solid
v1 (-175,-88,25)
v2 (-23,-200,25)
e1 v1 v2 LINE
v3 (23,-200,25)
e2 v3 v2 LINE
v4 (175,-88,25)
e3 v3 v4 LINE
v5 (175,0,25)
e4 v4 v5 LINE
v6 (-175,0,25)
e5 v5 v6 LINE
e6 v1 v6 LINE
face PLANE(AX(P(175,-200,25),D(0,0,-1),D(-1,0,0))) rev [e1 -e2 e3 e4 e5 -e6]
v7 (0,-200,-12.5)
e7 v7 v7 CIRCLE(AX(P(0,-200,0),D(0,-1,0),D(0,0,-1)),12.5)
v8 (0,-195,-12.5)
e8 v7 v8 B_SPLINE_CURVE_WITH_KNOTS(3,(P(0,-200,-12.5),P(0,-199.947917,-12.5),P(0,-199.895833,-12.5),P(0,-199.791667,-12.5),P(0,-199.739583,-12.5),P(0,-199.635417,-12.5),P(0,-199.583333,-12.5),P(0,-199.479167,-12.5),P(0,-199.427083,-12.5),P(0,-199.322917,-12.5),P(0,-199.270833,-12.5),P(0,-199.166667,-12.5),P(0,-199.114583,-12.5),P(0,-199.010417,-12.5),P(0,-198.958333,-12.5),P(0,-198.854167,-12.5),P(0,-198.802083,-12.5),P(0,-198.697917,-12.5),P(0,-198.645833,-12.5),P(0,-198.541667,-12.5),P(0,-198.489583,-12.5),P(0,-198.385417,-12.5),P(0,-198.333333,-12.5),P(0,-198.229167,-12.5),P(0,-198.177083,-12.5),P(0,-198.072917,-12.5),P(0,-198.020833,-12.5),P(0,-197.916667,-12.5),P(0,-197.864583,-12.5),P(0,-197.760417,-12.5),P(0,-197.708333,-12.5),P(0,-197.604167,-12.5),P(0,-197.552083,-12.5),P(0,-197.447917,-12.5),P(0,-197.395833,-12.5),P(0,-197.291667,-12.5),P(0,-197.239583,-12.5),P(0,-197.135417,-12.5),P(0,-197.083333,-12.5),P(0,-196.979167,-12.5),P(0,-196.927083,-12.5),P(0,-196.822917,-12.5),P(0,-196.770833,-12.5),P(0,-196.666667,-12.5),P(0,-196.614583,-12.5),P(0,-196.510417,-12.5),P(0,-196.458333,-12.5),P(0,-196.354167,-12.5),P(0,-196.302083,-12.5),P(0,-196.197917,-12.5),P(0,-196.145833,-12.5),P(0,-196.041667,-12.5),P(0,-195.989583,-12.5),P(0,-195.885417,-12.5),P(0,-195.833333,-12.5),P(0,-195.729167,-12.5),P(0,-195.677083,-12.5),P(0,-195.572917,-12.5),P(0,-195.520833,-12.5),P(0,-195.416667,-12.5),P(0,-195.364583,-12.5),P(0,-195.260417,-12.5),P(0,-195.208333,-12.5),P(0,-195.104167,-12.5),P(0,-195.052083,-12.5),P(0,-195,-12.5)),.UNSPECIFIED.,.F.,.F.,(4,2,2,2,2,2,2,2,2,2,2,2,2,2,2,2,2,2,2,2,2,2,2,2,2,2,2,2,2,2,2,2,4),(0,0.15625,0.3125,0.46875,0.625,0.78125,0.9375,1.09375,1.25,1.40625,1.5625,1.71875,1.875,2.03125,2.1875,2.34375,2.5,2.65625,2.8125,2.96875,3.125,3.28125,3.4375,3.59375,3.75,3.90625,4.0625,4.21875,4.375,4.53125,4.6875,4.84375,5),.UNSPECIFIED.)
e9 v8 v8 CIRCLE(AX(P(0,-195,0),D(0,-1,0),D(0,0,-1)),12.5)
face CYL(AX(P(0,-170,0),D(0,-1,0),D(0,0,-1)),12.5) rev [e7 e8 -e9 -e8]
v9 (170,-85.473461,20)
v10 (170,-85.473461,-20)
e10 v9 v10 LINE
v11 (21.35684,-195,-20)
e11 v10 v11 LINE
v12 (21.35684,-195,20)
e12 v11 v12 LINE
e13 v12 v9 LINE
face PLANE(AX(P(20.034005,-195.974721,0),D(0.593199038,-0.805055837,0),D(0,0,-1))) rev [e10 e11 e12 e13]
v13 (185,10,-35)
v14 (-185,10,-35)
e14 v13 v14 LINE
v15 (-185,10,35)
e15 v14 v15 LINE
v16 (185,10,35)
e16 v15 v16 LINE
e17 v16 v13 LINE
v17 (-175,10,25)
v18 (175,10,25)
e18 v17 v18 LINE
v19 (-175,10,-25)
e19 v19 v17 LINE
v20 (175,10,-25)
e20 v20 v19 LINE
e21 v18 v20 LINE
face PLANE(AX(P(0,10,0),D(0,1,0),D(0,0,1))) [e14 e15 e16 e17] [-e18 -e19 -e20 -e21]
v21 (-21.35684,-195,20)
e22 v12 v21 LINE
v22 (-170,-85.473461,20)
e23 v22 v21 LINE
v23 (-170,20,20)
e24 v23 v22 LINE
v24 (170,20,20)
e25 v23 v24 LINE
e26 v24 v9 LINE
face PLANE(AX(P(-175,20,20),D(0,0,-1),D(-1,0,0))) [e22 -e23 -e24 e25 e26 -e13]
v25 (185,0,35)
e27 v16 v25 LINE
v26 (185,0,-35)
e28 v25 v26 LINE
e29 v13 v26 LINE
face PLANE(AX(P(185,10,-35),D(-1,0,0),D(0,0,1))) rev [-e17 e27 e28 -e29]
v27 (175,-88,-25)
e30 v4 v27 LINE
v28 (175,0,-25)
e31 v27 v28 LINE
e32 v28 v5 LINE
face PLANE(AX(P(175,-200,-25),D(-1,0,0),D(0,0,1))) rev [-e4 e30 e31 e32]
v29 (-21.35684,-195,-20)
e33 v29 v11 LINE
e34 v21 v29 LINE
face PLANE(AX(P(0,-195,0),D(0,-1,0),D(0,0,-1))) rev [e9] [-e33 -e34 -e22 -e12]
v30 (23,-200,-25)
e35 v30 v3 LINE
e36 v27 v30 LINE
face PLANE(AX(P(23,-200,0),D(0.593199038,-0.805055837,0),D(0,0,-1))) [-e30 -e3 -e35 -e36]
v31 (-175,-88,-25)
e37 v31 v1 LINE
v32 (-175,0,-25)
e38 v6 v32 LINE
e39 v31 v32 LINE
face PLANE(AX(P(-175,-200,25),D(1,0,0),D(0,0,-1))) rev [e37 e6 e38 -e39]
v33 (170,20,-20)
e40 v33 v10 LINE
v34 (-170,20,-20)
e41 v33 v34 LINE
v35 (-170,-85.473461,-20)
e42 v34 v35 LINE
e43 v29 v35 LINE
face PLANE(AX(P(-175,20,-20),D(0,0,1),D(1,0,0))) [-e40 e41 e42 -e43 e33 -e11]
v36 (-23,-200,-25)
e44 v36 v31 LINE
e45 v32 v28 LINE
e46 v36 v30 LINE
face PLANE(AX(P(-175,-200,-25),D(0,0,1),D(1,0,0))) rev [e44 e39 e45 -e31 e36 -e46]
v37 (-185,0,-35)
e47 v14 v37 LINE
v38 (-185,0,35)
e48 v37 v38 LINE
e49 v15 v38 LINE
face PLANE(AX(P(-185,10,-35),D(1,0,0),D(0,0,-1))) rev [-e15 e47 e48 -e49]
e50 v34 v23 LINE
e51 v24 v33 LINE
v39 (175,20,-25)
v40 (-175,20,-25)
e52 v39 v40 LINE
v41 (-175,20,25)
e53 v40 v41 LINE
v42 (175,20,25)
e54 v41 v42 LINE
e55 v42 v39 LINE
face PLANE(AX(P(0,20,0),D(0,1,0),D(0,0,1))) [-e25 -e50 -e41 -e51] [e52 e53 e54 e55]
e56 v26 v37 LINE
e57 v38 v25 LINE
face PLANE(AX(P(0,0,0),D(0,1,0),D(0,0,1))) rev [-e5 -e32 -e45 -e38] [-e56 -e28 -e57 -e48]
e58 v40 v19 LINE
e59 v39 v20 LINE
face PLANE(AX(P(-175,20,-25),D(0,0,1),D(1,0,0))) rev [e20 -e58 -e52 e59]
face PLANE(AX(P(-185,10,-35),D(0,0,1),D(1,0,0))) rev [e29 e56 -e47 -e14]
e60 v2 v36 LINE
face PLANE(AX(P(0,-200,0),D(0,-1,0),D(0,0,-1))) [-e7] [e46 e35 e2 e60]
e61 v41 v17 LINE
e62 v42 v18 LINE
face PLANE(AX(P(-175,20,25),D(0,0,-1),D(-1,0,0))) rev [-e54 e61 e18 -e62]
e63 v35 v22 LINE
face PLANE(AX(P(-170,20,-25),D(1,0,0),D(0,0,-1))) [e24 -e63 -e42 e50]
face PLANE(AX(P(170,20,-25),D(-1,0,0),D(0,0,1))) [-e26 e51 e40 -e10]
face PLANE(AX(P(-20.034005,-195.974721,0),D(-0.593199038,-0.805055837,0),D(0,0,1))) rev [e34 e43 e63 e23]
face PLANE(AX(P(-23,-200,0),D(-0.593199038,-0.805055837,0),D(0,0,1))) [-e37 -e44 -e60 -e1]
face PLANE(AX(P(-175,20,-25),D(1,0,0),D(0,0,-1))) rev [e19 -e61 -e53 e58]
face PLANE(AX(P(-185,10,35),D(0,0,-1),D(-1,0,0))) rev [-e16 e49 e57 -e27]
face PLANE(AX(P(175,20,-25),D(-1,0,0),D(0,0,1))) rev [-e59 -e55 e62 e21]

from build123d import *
from OCP.BRepFilletAPI import BRepFilletAPI_MakeChamfer

# Parameters (mm, degrees)
SKETCH_1_W          = 370
SKETCH_1_H          = 70
EXTRUDE_1_DEPTH     = 10
SKETCH_2_W          = 350
SKETCH_2_H          = 50
EXTRUDE_2_DEPTH     = 10
SKETCH_3_W          = 350
SKETCH_3_H          = 50
EXTRUDE_3_DEPTH     = 200
CHAMFER_1_SIZE      = 112
CHAMFER_1_SIZE2     = 152
SHELL_START         = -20
SHELL_1_DEPTH       = 40
SKETCH_4_R          = 12.5
CUT_EXTRUDE_1_DEPTH = 30


# Read off the part's stored shape, not the designer's step: 抽壳1
with BuildPart() as part:
    # 草图1 → 凸台-拉伸1 (new body)
    with BuildSketch(Plane(origin=(0, 0, 0), x_dir=(1, 0, 0), z_dir=(0, 1, 0))):
        Rectangle(SKETCH_1_W, SKETCH_1_H)
    extrude(amount=EXTRUDE_1_DEPTH)

    # 草图2 → 凸台-拉伸2 (add)
    with BuildSketch(Plane(origin=(0, 10, 0), x_dir=(1, 0, 0), z_dir=(0, 1, 0))):
        Rectangle(SKETCH_2_W, SKETCH_2_H)
    extrude(amount=EXTRUDE_2_DEPTH)

    # 草图3 → 凸台-拉伸3 (add)
    with BuildSketch(Plane.XZ):
        Rectangle(SKETCH_3_W, SKETCH_3_H)
    extrude(amount=EXTRUDE_3_DEPTH)

    # 倒角1: one chamfer whose edges measure the first distance from different faces: ONE call of the kernel's chamfer builder (chamfer() names one face for all edges)
    chamfer_1_edges_1 = [part.edges().sort_by_distance(p)[0] for p in [
        (-175, -200, 0),
    ]]
    chamfer_1_side_1 = [part.faces().sort_by_distance(p)[0] for p in [
        (-175, -100, 0),
    ]]
    chamfer_1_edges_2 = [part.edges().sort_by_distance(p)[0] for p in [
        (175, -200, 0),
    ]]
    chamfer_1_side_2 = [part.faces().sort_by_distance(p)[0] for p in [
        (175, -100, 0),
    ]]
    chamfer_1 = BRepFilletAPI_MakeChamfer(part.part.solid().wrapped)
    for e in chamfer_1_edges_1:
        chamfer_1.Add(CHAMFER_1_SIZE, CHAMFER_1_SIZE2, e.wrapped, chamfer_1_side_1[0].wrapped)  # the first distance lies on this face
    for e in chamfer_1_edges_2:
        chamfer_1.Add(CHAMFER_1_SIZE, CHAMFER_1_SIZE2, e.wrapped, chamfer_1_side_2[0].wrapped)  # the first distance lies on this face
    add(Compound.cast(chamfer_1.Shape()), mode=Mode.REPLACE)

    # 抽壳1 outline → 抽壳1 (cut)
    with BuildSketch(Plane.XY.offset(SHELL_START)):
        Polygon((170, -85.473461199), (170, 20), (-170, 20), (-170, -85.473461199), (-21.356840199, -195), (21.356840199, -195), align=None)
    extrude(amount=SHELL_1_DEPTH, mode=Mode.SUBTRACT)

    # 草图4 → 切除-拉伸1 (cut)
    with BuildSketch(Plane.XZ.offset(200)):
        with Locations(Location((0, 0, 0), (0, 0, 270))):
            Circle(SKETCH_4_R)
    extrude(amount=-CUT_EXTRUDE_1_DEPTH, mode=Mode.SUBTRACT)


solid = part.part
